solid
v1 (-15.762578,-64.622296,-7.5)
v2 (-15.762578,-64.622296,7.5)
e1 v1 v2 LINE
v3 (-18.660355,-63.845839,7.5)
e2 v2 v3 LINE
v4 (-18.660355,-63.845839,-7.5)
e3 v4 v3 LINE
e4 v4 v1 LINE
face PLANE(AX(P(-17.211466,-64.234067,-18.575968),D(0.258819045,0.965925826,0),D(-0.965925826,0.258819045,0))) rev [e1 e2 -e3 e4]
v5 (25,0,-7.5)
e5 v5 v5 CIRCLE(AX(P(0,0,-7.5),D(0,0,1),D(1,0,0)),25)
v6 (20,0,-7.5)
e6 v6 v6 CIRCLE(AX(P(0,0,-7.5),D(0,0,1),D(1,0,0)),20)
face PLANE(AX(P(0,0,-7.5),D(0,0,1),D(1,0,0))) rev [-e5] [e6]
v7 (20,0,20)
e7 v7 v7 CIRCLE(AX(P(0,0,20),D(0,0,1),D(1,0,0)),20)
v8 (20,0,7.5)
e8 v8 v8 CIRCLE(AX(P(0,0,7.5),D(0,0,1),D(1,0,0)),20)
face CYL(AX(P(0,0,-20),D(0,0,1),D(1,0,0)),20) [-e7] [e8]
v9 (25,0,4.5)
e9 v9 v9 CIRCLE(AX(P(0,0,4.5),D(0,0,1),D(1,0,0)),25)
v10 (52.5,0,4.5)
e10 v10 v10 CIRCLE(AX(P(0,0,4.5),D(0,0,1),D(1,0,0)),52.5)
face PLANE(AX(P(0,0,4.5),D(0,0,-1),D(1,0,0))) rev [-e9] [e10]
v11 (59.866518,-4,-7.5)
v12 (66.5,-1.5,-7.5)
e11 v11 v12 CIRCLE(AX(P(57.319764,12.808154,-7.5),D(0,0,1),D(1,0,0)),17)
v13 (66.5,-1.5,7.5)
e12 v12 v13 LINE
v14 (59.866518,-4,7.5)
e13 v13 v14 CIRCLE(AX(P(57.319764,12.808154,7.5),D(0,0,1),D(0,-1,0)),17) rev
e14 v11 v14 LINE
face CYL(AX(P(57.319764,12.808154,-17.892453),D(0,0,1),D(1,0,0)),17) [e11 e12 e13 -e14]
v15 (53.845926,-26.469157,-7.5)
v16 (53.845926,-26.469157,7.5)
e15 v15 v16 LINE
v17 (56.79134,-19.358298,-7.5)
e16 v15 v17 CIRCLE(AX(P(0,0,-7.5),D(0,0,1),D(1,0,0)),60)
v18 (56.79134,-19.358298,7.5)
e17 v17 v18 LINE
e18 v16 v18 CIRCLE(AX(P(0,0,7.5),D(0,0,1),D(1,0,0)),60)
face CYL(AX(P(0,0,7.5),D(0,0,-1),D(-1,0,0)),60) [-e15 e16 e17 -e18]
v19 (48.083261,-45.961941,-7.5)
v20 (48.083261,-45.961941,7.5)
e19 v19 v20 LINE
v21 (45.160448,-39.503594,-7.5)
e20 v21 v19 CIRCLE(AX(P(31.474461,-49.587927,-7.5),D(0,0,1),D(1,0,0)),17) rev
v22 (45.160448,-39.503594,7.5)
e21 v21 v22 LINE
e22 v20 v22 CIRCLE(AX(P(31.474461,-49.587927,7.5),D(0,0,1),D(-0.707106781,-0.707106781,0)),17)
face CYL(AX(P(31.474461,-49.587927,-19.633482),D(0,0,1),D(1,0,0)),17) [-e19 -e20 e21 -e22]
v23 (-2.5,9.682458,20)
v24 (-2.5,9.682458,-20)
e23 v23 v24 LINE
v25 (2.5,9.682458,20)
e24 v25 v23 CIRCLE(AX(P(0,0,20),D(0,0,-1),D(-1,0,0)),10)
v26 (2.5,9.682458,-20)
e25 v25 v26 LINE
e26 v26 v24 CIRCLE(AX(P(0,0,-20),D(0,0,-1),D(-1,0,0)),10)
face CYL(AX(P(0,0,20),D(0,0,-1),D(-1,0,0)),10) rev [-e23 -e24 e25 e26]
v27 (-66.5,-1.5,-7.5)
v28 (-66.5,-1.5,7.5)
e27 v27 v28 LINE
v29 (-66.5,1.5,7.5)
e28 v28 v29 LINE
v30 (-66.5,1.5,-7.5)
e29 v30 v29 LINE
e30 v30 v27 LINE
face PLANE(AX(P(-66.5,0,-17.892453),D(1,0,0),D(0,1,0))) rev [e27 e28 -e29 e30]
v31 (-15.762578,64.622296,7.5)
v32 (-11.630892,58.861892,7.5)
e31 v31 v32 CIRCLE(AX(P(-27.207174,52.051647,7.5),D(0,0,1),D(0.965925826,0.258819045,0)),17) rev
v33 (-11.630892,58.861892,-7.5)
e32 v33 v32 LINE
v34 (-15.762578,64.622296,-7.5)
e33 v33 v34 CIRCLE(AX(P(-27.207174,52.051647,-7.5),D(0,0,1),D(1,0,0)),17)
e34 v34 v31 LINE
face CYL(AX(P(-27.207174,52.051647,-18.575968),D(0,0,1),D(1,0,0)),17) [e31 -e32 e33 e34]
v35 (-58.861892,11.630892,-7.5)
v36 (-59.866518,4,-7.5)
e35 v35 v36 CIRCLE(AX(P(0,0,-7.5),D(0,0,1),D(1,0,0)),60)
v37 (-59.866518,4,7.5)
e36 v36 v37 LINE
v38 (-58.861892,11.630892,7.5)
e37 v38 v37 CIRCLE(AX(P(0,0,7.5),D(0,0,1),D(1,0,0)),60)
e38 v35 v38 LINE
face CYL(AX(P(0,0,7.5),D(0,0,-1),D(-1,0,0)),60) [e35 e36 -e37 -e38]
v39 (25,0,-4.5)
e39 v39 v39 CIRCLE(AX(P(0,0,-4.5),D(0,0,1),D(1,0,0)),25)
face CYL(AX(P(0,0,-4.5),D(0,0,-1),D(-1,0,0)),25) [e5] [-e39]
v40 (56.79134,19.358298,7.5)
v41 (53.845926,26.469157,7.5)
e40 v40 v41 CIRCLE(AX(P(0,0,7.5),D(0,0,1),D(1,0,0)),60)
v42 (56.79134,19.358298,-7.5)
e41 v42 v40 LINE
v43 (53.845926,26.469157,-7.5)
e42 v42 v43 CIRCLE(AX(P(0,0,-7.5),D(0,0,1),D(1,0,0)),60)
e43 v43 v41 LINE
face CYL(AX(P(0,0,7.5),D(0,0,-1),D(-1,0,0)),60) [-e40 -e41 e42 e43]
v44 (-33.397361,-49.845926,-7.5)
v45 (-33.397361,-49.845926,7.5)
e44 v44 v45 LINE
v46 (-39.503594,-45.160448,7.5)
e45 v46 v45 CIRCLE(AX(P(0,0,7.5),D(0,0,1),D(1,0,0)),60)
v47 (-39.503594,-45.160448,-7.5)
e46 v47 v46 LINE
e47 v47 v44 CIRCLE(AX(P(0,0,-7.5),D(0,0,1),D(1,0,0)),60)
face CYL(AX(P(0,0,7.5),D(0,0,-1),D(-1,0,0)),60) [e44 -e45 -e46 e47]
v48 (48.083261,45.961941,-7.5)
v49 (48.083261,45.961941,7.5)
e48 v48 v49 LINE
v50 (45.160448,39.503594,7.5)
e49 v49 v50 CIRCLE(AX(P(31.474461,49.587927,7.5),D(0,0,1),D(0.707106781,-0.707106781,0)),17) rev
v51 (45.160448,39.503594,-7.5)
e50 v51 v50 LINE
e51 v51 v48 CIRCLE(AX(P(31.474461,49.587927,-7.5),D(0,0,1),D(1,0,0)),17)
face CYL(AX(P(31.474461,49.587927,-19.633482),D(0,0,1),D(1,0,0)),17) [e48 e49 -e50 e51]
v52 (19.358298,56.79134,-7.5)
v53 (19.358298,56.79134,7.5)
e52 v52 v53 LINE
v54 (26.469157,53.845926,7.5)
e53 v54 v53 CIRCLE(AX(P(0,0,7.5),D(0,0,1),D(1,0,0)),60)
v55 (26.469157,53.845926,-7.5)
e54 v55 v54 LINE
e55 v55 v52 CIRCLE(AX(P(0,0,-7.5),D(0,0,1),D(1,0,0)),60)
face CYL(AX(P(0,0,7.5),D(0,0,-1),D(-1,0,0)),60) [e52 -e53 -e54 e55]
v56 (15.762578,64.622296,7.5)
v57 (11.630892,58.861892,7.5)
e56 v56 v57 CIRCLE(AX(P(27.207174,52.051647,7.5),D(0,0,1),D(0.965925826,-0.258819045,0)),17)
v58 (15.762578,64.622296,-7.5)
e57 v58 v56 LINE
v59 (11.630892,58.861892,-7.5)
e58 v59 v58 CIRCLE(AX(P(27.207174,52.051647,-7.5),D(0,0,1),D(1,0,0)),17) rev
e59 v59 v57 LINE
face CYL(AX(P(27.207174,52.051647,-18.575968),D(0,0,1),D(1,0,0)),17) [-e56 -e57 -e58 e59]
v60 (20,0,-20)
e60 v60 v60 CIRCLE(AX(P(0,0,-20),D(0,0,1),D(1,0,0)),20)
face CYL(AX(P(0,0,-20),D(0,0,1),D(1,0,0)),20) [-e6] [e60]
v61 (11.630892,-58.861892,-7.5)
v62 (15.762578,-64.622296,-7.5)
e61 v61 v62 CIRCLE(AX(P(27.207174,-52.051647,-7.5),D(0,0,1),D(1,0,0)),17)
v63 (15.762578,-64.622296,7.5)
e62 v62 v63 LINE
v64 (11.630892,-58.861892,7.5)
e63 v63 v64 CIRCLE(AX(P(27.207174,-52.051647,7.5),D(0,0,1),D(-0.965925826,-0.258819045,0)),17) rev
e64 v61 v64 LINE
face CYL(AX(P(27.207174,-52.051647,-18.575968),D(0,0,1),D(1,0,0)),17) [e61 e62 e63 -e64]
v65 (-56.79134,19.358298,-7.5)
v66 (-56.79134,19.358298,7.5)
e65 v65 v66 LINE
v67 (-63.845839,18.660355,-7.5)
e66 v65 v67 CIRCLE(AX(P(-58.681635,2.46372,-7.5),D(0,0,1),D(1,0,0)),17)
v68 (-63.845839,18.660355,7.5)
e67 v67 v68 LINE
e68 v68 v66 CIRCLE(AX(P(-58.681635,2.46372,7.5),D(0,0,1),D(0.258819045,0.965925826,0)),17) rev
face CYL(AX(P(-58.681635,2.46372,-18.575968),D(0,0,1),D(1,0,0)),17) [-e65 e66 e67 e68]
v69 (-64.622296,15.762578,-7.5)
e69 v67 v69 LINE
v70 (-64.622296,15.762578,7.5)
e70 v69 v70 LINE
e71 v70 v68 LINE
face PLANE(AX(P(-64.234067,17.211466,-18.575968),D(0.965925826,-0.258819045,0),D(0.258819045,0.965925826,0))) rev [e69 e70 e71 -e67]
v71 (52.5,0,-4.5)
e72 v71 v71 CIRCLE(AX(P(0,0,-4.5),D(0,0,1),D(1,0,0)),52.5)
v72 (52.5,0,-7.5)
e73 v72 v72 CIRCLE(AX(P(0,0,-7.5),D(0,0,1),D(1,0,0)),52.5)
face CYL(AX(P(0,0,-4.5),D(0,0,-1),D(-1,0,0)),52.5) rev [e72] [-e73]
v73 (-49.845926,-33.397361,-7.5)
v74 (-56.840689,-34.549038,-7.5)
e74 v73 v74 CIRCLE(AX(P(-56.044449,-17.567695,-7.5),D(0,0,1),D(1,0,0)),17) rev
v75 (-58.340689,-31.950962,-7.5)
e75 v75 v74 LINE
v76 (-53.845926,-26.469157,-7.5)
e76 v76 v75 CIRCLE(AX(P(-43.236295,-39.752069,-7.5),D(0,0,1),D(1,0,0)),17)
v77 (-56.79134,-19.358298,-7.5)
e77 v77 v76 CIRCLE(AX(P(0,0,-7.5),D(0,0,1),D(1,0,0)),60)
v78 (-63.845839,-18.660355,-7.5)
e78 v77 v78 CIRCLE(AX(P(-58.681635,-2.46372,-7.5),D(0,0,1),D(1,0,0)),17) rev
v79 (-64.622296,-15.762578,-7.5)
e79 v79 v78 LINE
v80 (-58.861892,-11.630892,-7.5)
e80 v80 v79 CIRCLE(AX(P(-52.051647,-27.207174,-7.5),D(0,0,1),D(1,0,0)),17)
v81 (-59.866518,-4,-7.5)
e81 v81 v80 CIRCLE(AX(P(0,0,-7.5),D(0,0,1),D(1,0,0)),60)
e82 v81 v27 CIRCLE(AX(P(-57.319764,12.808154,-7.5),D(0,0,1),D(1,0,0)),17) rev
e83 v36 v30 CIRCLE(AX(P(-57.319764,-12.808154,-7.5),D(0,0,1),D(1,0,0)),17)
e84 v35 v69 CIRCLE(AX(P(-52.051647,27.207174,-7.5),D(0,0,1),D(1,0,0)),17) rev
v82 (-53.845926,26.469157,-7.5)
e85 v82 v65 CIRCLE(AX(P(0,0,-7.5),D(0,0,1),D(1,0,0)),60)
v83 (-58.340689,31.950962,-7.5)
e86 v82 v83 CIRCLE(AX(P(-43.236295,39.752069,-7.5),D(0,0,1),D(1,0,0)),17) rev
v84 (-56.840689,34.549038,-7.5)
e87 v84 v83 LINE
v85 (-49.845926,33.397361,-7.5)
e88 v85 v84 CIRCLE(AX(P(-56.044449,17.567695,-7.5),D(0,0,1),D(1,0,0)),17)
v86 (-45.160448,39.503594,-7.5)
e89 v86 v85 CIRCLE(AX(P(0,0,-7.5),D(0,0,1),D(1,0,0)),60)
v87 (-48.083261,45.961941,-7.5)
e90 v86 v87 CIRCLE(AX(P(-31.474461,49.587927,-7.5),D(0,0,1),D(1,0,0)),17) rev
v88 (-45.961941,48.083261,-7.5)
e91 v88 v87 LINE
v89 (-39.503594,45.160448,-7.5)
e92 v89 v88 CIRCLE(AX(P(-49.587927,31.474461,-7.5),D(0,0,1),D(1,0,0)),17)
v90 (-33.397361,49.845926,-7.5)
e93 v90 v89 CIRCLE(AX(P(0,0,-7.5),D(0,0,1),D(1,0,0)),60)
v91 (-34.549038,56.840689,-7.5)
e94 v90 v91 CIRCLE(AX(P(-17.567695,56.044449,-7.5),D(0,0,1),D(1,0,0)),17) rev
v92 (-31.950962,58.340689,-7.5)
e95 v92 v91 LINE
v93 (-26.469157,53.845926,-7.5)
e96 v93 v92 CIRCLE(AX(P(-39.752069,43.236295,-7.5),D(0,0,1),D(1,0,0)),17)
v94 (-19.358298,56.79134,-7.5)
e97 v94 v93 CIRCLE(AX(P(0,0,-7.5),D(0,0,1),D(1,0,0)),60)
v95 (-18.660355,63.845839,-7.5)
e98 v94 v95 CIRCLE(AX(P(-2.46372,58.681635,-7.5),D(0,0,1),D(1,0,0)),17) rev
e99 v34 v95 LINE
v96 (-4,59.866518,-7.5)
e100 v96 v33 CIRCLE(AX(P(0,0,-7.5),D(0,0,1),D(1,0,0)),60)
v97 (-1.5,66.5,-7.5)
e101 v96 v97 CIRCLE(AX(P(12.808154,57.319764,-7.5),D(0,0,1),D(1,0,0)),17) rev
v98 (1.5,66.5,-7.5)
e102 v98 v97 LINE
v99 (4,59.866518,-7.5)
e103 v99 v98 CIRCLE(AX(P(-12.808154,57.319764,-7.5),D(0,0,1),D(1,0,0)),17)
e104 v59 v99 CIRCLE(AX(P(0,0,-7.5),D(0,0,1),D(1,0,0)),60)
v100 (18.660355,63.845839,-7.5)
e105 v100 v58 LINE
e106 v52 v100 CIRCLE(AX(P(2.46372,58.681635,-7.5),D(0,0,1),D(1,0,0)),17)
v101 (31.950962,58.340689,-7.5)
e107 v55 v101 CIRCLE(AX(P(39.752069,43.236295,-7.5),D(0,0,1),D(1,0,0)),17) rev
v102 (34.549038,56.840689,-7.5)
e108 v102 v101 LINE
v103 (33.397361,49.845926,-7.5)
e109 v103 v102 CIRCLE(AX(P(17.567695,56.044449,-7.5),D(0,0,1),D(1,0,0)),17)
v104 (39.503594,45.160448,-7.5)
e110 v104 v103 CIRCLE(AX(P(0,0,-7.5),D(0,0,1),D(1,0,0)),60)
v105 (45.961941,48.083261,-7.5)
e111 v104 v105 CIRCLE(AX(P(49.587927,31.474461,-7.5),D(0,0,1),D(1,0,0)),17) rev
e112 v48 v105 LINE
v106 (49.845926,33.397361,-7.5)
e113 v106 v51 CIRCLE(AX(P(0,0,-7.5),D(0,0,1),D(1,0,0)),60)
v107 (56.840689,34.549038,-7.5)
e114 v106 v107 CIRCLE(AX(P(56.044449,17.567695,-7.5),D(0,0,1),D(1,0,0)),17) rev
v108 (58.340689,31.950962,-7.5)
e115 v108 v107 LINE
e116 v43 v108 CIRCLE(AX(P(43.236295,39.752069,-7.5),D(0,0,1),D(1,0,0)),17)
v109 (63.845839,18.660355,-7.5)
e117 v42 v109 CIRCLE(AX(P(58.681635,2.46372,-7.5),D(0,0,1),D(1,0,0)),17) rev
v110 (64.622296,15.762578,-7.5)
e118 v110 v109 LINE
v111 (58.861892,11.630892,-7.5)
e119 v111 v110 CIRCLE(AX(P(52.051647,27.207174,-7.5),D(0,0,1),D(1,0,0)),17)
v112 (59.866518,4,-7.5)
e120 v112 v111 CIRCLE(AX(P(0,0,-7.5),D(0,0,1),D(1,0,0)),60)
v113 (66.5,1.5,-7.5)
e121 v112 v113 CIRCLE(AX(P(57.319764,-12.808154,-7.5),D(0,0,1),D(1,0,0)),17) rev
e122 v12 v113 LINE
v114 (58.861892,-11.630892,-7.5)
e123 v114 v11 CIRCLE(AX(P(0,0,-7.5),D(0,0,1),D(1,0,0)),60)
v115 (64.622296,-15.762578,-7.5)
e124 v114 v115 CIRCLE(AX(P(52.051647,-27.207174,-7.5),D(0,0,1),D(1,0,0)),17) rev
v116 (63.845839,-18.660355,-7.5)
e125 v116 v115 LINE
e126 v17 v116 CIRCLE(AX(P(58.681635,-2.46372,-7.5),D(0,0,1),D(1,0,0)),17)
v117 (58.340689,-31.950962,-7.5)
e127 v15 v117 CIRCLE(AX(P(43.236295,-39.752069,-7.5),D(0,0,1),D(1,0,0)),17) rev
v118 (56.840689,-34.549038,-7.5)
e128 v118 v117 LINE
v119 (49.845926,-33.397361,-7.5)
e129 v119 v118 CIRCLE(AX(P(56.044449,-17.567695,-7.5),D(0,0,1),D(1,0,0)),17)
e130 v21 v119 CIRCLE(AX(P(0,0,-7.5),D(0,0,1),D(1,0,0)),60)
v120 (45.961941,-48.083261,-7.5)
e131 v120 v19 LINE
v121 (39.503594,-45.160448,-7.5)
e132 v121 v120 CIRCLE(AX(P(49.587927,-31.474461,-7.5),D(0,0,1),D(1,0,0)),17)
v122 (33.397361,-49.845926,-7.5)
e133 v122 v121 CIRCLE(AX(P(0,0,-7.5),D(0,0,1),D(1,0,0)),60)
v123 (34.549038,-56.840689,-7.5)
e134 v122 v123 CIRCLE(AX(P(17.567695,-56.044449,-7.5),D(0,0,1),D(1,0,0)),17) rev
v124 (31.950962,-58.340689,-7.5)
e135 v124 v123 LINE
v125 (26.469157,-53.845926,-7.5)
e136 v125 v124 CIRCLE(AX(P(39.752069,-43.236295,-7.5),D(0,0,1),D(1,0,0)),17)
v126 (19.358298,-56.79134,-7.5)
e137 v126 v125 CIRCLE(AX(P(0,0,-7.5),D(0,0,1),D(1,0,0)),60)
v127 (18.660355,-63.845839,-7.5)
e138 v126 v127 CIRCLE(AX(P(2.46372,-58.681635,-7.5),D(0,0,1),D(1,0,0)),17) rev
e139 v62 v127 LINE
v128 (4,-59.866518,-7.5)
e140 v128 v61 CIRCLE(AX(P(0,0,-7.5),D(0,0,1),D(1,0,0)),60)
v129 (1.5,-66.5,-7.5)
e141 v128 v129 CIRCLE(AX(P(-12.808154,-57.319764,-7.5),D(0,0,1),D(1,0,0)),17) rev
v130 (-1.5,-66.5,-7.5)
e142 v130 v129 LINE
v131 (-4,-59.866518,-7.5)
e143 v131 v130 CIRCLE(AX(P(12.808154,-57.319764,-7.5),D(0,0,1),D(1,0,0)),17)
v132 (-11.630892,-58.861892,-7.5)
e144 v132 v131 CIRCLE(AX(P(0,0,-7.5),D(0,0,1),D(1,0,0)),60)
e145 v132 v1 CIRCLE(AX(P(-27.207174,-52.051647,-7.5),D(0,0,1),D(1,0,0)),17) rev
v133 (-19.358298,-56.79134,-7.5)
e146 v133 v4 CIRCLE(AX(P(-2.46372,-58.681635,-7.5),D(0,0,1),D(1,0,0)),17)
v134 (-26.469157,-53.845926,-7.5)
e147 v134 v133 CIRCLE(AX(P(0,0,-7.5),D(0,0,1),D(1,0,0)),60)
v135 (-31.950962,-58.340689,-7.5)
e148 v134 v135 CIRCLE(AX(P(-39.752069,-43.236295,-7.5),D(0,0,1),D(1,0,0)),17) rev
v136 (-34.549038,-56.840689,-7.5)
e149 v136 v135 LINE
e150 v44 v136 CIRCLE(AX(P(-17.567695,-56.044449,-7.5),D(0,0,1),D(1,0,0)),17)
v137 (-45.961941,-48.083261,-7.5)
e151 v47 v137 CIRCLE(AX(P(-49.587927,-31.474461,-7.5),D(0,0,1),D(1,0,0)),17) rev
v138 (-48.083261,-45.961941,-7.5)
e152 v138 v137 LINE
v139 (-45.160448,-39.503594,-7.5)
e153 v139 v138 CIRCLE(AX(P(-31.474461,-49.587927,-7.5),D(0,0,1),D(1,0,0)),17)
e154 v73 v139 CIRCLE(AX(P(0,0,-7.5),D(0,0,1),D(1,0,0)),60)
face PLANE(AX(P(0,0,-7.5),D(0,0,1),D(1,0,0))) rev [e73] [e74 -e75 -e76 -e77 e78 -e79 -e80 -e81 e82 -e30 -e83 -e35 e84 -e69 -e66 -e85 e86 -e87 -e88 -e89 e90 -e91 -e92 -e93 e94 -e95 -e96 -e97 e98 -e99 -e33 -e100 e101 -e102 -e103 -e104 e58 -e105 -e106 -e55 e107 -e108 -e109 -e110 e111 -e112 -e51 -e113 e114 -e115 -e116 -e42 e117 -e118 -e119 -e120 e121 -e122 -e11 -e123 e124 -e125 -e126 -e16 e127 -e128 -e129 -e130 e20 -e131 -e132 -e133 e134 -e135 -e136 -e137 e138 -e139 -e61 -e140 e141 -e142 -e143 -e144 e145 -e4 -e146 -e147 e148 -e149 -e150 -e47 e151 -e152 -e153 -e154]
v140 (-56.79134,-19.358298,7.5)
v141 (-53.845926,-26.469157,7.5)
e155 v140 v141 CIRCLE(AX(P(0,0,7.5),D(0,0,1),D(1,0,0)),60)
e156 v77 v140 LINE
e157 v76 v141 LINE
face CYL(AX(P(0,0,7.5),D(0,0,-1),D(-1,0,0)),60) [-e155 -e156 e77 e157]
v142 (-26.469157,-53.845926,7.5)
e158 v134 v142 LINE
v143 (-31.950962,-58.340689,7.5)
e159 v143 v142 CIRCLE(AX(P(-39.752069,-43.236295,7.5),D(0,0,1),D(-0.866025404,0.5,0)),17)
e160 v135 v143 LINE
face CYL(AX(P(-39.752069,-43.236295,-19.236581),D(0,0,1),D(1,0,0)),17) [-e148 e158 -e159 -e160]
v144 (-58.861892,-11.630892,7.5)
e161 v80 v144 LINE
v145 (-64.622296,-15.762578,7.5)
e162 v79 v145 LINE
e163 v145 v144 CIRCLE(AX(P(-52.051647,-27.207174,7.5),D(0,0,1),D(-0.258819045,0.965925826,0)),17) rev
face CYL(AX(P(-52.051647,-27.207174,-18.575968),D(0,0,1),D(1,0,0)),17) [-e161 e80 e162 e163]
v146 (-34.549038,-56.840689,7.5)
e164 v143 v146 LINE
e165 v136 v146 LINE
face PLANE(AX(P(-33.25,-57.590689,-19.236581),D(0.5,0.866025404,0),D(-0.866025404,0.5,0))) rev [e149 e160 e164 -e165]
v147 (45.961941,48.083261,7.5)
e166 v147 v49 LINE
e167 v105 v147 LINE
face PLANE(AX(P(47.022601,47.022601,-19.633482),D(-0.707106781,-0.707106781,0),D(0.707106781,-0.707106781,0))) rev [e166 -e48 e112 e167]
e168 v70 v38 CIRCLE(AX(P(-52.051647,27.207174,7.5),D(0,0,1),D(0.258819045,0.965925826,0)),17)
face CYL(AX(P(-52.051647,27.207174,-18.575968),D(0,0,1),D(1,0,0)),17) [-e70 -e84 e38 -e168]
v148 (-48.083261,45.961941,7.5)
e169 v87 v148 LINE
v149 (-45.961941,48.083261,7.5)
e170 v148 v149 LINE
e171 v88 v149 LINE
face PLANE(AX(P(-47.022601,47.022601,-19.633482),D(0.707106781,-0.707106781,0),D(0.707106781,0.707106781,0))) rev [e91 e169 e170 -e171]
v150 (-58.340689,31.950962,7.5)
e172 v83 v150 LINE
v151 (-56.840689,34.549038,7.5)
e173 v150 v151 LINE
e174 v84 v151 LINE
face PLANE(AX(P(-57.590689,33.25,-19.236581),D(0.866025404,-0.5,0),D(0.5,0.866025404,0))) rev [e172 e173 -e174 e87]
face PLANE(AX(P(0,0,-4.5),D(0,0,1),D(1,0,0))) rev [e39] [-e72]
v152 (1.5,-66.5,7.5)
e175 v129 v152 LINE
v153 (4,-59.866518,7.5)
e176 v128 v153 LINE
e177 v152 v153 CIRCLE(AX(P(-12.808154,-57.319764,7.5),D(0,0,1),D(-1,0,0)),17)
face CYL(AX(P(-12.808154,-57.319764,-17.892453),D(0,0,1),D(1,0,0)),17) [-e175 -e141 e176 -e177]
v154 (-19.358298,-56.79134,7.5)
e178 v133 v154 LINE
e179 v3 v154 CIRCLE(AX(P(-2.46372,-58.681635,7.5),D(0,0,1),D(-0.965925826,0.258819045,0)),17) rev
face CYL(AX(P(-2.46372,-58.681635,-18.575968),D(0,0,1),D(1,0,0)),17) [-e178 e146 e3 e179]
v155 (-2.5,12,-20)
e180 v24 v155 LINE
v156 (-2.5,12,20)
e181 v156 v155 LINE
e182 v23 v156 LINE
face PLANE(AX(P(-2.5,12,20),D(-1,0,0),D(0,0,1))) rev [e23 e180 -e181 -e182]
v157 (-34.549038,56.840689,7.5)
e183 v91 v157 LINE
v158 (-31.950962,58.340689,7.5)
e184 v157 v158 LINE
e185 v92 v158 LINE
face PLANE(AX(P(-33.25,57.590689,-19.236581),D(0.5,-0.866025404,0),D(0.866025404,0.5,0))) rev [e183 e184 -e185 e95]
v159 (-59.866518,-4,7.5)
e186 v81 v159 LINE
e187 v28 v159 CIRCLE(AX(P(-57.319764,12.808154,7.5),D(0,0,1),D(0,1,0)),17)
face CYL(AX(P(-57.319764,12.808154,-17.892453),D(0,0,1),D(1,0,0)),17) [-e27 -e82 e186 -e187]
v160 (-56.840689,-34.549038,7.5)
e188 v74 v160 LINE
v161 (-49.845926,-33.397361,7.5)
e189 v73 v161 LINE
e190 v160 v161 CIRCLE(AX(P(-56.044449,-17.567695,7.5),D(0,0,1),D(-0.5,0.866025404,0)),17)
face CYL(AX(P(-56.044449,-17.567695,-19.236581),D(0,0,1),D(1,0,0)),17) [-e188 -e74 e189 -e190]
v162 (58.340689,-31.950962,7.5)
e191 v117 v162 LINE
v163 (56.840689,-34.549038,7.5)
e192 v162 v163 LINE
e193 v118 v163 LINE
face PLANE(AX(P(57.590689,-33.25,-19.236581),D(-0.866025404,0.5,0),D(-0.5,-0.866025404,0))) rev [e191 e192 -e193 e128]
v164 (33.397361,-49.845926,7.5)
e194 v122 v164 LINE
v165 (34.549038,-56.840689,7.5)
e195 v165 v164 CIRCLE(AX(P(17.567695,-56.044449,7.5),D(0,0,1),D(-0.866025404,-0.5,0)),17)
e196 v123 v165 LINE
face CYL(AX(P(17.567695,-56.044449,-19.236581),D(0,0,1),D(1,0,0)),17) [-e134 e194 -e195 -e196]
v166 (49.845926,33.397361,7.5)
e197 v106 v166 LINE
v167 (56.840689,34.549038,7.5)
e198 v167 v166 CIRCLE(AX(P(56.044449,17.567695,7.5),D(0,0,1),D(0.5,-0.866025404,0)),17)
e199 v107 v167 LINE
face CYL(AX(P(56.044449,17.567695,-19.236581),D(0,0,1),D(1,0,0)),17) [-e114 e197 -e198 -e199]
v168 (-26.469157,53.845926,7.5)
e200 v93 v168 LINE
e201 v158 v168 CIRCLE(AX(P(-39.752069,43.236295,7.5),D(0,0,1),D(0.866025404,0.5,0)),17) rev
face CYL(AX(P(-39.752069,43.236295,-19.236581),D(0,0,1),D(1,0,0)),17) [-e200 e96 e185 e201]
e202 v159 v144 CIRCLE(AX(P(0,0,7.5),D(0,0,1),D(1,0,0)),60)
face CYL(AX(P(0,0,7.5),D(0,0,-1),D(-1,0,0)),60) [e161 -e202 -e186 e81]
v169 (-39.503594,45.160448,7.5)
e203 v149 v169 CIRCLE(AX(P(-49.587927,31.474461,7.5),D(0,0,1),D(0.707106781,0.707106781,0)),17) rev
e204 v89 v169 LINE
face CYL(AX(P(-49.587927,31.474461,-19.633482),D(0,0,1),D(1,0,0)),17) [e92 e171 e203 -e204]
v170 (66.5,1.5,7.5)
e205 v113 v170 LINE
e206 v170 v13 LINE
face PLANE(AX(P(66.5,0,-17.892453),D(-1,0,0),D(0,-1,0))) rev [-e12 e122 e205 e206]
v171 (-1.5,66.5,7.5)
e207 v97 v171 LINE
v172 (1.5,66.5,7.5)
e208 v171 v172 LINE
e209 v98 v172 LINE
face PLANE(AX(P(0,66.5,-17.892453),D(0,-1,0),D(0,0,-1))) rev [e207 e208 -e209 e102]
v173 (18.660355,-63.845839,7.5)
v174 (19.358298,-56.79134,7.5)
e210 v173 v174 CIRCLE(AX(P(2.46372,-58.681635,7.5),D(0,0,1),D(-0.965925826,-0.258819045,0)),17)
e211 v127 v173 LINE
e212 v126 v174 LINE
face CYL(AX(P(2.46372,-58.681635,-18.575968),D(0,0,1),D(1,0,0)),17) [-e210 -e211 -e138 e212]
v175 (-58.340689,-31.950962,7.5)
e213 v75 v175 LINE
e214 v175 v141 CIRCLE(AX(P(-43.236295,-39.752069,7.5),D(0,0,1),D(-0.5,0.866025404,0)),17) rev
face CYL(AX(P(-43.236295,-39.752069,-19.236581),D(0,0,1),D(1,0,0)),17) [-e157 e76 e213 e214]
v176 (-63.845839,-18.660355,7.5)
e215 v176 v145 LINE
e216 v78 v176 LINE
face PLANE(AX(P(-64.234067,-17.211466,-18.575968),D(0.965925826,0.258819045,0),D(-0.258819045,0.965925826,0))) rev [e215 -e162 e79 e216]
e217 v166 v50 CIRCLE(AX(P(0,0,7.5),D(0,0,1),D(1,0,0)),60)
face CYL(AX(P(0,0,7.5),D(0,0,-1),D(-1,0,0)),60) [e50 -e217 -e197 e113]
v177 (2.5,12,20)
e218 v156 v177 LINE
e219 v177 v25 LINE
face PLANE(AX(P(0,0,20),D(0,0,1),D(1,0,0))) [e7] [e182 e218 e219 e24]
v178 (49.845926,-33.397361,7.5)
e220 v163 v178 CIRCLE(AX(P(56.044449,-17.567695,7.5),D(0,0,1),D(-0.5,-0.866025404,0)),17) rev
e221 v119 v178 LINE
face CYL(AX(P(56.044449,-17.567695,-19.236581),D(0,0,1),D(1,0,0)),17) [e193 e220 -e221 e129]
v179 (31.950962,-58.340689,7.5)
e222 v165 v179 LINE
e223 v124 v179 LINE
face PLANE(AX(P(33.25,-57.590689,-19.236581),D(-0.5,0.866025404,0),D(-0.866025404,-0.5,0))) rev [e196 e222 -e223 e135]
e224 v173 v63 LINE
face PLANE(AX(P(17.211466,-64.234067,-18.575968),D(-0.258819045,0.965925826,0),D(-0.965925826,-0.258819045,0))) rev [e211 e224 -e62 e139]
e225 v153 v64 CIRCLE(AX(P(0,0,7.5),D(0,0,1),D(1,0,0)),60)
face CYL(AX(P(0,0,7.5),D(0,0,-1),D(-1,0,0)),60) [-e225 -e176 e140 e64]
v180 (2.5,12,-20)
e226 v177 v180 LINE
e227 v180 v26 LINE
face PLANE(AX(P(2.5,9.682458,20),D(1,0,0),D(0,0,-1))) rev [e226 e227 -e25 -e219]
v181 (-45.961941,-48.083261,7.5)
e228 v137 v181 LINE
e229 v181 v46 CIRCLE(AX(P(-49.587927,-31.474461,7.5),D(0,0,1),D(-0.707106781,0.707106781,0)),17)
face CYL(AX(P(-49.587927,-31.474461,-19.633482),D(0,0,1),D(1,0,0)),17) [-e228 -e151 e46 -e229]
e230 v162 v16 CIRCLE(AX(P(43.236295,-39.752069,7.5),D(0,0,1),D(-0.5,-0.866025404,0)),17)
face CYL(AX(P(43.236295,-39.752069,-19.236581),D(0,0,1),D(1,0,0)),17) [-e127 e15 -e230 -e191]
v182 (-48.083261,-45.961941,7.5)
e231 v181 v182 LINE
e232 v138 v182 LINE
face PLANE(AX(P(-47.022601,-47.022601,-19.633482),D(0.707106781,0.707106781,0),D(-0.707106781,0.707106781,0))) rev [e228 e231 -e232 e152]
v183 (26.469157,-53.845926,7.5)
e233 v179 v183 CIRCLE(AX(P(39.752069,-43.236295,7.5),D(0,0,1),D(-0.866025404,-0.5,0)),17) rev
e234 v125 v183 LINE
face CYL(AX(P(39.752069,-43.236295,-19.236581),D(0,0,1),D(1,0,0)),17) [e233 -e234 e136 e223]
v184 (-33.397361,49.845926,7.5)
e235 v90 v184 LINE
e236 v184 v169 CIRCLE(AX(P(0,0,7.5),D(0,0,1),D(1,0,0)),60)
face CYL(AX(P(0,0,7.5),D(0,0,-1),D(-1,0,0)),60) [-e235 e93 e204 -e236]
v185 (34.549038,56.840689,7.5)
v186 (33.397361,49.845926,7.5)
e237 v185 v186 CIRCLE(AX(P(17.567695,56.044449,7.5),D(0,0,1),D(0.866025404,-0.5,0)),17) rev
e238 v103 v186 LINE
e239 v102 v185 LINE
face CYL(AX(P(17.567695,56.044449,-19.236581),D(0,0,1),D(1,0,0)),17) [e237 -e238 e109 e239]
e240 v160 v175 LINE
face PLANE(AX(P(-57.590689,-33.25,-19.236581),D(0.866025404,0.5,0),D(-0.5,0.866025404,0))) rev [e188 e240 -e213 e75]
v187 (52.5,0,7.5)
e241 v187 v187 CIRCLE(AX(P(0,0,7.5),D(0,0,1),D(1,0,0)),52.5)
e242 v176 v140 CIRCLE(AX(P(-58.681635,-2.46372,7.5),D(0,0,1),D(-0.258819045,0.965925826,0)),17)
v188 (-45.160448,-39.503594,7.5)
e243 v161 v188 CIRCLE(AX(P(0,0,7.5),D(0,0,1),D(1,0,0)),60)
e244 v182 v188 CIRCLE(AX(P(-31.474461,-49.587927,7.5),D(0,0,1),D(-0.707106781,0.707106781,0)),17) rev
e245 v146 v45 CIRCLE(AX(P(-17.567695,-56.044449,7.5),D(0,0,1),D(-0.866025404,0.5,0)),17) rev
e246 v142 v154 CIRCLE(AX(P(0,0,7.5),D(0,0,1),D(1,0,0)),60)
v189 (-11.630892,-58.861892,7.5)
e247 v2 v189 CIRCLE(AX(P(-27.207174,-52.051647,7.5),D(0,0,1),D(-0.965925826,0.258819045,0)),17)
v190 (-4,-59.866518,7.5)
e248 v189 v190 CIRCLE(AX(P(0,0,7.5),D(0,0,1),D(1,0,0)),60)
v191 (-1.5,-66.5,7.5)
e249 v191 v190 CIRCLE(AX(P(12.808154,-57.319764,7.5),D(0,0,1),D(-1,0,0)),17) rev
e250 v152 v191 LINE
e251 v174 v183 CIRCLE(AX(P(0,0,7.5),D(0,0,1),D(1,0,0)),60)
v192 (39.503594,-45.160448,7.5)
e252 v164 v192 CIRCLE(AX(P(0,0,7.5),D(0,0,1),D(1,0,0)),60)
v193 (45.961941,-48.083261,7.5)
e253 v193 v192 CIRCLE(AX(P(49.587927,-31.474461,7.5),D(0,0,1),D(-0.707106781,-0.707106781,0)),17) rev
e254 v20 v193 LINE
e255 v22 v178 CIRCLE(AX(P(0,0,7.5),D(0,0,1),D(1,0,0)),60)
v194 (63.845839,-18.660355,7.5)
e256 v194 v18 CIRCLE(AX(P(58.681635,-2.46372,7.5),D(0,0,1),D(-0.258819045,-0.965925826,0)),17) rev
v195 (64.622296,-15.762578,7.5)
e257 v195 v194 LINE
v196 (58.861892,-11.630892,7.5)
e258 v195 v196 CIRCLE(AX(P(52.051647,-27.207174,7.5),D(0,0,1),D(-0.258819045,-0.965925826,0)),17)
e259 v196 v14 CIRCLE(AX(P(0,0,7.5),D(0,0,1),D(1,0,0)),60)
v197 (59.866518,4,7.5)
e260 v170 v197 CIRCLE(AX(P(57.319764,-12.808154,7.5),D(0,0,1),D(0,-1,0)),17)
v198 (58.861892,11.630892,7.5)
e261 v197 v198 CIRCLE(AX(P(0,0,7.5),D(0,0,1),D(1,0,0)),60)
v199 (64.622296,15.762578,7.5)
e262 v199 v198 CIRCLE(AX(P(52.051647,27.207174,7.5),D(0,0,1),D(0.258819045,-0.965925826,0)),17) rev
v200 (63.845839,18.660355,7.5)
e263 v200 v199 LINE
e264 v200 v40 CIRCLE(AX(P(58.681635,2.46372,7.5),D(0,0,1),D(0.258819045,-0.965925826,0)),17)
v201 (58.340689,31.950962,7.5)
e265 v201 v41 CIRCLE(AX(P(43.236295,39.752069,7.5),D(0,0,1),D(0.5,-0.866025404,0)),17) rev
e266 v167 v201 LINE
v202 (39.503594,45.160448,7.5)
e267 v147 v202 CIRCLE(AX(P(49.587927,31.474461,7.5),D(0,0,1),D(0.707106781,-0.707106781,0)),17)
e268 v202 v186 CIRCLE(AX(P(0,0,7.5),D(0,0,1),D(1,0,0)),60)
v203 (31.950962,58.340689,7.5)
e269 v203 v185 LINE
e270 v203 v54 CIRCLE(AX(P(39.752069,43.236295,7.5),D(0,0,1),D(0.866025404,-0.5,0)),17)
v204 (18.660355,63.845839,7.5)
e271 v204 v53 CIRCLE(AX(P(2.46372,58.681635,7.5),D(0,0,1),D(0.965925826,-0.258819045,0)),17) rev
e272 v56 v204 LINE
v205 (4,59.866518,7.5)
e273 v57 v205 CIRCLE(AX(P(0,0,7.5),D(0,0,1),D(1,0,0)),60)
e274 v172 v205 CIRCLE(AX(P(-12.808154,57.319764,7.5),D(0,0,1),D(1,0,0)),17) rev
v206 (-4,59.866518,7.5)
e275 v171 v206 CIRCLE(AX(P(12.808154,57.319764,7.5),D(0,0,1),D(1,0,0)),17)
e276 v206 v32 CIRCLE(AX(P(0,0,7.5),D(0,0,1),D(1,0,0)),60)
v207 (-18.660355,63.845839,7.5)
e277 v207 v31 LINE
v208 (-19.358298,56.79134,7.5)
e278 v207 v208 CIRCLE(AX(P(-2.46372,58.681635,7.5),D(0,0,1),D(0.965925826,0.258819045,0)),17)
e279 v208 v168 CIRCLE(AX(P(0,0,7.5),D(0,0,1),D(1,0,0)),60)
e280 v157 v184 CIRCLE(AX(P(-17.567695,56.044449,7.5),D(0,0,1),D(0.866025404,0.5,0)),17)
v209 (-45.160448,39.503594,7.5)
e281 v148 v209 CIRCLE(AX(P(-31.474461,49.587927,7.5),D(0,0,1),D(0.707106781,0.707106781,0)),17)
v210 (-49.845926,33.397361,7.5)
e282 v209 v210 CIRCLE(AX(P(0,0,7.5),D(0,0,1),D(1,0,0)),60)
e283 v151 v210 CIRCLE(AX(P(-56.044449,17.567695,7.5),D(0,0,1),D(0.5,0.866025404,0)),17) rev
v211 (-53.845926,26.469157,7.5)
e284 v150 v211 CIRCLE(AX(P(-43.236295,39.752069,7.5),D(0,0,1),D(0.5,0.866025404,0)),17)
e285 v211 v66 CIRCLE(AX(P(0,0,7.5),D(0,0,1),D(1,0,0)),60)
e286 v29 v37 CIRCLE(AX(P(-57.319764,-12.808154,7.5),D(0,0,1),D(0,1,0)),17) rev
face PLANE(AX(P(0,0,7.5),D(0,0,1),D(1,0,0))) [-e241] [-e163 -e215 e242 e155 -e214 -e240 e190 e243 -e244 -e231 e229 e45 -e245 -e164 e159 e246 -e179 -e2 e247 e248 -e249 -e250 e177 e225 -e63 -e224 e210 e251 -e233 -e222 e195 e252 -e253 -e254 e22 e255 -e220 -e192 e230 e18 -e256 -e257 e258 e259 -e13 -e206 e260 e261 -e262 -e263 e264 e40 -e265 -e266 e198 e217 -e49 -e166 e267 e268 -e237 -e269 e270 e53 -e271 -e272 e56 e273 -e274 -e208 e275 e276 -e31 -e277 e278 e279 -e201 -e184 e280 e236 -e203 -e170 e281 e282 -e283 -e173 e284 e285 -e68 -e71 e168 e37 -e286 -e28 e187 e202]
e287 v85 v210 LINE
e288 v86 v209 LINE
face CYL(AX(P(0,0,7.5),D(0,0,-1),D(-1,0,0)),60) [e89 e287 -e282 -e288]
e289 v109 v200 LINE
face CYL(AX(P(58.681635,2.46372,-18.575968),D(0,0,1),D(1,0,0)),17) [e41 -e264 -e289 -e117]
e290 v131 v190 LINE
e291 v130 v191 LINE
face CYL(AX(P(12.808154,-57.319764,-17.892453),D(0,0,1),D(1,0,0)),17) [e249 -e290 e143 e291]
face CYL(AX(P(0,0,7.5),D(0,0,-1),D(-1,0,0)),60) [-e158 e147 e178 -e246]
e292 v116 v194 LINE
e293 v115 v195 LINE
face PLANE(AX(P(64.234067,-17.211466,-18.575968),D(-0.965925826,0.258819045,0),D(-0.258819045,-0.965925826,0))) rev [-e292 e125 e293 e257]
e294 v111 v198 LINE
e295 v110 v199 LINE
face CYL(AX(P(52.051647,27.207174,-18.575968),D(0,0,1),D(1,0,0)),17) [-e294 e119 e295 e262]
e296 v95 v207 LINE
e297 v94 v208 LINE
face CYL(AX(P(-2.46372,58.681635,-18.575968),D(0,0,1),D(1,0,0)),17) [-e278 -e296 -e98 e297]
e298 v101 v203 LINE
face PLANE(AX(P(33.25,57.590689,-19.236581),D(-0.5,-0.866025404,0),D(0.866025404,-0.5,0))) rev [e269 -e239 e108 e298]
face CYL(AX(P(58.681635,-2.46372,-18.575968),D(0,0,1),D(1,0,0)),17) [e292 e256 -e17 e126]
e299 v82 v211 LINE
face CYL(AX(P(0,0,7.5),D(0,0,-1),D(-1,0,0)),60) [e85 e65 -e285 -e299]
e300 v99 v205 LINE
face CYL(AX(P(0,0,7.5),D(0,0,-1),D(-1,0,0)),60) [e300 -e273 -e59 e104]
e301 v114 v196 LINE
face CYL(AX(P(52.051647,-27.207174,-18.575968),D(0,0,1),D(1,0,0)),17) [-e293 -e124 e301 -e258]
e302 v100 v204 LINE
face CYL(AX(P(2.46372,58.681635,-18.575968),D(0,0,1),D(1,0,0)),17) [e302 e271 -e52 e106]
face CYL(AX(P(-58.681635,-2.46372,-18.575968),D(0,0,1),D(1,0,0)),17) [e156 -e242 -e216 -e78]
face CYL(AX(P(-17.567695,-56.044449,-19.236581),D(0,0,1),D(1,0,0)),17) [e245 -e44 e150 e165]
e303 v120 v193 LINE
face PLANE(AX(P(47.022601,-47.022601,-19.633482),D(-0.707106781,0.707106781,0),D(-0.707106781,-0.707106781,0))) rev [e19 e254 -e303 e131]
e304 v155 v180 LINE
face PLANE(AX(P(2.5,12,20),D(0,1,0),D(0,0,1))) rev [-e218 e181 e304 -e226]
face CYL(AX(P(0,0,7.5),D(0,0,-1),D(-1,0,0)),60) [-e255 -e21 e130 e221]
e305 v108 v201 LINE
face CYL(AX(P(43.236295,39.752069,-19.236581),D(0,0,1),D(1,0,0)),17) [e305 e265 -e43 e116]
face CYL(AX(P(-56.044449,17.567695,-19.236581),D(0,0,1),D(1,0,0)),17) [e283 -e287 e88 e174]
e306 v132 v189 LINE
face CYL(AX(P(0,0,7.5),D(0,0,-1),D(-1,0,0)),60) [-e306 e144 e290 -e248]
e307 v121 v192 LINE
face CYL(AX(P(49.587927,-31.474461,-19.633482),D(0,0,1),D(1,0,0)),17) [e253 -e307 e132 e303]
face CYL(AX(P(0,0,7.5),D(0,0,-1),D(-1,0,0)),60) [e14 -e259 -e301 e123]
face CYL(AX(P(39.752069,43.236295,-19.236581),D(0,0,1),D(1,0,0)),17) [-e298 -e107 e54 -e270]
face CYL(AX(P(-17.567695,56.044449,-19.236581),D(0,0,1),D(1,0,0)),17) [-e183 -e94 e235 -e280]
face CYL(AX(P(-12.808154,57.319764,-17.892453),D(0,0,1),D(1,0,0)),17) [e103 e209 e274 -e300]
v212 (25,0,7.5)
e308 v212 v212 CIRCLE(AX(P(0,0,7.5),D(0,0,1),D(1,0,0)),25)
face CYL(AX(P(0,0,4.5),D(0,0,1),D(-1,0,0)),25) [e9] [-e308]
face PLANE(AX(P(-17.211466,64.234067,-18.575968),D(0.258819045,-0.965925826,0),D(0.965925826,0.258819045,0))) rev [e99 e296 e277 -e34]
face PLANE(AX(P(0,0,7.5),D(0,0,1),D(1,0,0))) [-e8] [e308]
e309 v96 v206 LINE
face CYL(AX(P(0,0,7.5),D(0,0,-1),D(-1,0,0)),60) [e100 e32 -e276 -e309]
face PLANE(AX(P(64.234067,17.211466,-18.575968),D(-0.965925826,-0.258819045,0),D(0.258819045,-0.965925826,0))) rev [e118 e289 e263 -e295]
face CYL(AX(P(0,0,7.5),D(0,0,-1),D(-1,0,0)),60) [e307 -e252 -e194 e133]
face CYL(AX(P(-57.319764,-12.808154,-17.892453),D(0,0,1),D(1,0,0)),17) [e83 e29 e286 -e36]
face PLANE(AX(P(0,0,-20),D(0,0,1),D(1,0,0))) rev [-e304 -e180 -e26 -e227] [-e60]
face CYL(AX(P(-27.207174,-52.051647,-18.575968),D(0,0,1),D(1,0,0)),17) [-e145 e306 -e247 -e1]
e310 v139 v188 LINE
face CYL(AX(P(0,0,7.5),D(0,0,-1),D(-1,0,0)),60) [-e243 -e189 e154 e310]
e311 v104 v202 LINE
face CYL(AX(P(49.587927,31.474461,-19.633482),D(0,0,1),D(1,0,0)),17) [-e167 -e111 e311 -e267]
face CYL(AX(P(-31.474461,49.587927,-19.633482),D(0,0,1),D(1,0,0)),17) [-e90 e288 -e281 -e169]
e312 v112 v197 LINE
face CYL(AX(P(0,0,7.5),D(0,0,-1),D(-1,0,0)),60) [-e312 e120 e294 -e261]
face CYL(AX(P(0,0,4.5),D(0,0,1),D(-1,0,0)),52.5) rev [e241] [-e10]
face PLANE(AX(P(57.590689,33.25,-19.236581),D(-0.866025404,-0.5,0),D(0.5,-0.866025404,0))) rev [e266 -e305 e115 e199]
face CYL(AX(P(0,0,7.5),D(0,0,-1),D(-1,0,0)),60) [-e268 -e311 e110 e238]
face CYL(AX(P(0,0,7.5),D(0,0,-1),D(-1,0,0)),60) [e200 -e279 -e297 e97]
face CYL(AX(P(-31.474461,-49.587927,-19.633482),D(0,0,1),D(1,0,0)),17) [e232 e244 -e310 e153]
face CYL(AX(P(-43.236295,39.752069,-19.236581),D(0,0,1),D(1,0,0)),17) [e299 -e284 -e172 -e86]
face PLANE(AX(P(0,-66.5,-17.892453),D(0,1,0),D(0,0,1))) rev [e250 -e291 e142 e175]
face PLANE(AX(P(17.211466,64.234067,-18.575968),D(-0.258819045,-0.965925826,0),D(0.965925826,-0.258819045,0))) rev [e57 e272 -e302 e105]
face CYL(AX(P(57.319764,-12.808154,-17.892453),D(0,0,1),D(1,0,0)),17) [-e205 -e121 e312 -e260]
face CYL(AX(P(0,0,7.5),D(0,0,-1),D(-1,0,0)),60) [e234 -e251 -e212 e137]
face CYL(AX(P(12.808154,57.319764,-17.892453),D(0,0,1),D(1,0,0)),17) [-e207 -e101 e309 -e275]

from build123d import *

# Parameters (mm, degrees)
SKETCH1_R           = 60
BOSS_EXTRUDE1_DEPTH = 7.5
BOSS_EXTRUDE2_DEPTH = 15
CIRPATTERN1_START   = -7.5
CIRPATTERN1_DEPTH   = 15
SKETCH3_R           = 20
BOSS_EXTRUDE3_DEPTH = 20
CUT_EXTRUDE1_DEPTH  = 103.198336581
CUT_EXTRUDE4_START  = -7.5
SKETCH5_R           = 52.5
SKETCH5_R_2         = 25
CUT_EXTRUDE4_DEPTH  = 3


# Read off the part's stored shape, not the designer's step: CirPattern1
with BuildPart() as part:
    # Sketch1 → Boss-Extrude1 (new, symmetric)
    with BuildSketch(Plane.XY):
        Circle(SKETCH1_R)
    extrude(amount=BOSS_EXTRUDE1_DEPTH, both=True)

    # Sketch2 → Boss-Extrude2 (add)
    with BuildSketch(Plane.XY.offset(7.5)):
        with BuildLine():
            Line((0, 66.5), (0, 60))
            ThreePointArc((0, 60), (2.001113277, 59.966620262), (4, 59.866518188))
            ThreePointArc((4, 59.866518188), (3.099609074, 63.315018359), (1.5, 66.5))
            Line((1.5, 66.5), (0, 66.5))
        make_face()
        with BuildLine():
            ThreePointArc((-4, 59.866518188), (-2.001113277, 59.966620262), (0, 60))
            Line((0, 60), (0, 66.5))
            Line((0, 66.5), (-1.5, 66.5))
            ThreePointArc((-1.5, 66.5), (-3.099609074, 63.315018359), (-4, 59.866518188))
        make_face()
    extrude(amount=-BOSS_EXTRUDE2_DEPTH)

    # CirPattern1 outline → CirPattern1 (add)
    with BuildSketch(Plane.XY.offset(CIRPATTERN1_START)):
        with BuildLine():
            ThreePointArc((-18.660355239, 63.845838881), (-19.381125049, 60.355373564), (-19.358298376, 56.791339868))
            ThreePointArc((-19.358298376, 56.791339868), (-15.529142706, 57.955549577), (-11.630891766, 58.861892228))
            ThreePointArc((-11.630891766, 58.861892228), (-13.393140136, 61.959849286), (-15.76257776, 64.622296016))
            Line((-15.76257776, 64.622296016), (-18.660355239, 63.845838881))
        make_face()
        with BuildLine():
            ThreePointArc((-34.549038106, 56.840689352), (-34.34184938, 53.282609803), (-33.397360709, 49.845925587))
            ThreePointArc((-33.397360709, 49.845925587), (-30, 51.961524227), (-26.469157479, 53.845925587))
            ThreePointArc((-26.469157479, 53.845925587), (-28.973168979, 56.382218877), (-31.950961894, 58.340689352))
            Line((-31.950961894, 58.340689352), (-34.549038106, 56.840689352))
        make_face()
        with BuildLine():
            ThreePointArc((-48.083261121, 45.961940777), (-46.962233428, 42.578724237), (-45.160448102, 39.503593852))
            ThreePointArc((-45.160448102, 39.503593852), (-42.426406871, 42.426406871), (-39.503593852, 45.160448102))
            ThreePointArc((-39.503593852, 45.160448102), (-42.578724237, 46.962233428), (-45.961940777, 48.083261121))
            Line((-45.961940777, 48.083261121), (-48.083261121, 45.961940777))
        make_face()
        with BuildLine():
            ThreePointArc((-58.340689352, 31.950961894), (-56.382218877, 28.973168979), (-53.845925587, 26.469157479))
            ThreePointArc((-53.845925587, 26.469157479), (-51.961524227, 30), (-49.845925587, 33.397360709))
            ThreePointArc((-49.845925587, 33.397360709), (-53.282609803, 34.34184938), (-56.840689352, 34.549038106))
            Line((-56.840689352, 34.549038106), (-58.340689352, 31.950961894))
        make_face()
        with BuildLine():
            ThreePointArc((-64.622296016, 15.76257776), (-61.959849286, 13.393140136), (-58.861892229, 11.630891766))
            ThreePointArc((-58.861892229, 11.630891766), (-57.955549577, 15.529142706), (-56.791339868, 19.358298376))
            ThreePointArc((-56.791339868, 19.358298376), (-60.355373564, 19.381125049), (-63.845838881, 18.660355239))
            Line((-63.845838881, 18.660355239), (-64.622296016, 15.76257776))
        make_face()
        with BuildLine():
            ThreePointArc((-66.5, -1.5), (-63.315018359, -3.099609074), (-59.866518188, -4))
            ThreePointArc((-59.866518188, -4), (-60, 0), (-59.866518188, 4))
            ThreePointArc((-59.866518188, 4), (-63.315018359, 3.099609074), (-66.5, 1.5))
            Line((-66.5, 1.5), (-66.5, -1.5))
        make_face()
        with BuildLine():
            ThreePointArc((-63.845838881, -18.660355239), (-60.355373564, -19.381125049), (-56.791339868, -19.358298376))
            ThreePointArc((-56.791339868, -19.358298376), (-57.955549577, -15.529142706), (-58.861892228, -11.630891766))
            ThreePointArc((-58.861892228, -11.630891766), (-61.959849286, -13.393140136), (-64.622296016, -15.76257776))
            Line((-64.622296016, -15.76257776), (-63.845838881, -18.660355239))
        make_face()
        with BuildLine():
            ThreePointArc((-56.840689352, -34.549038106), (-53.282609803, -34.34184938), (-49.845925587, -33.397360709))
            ThreePointArc((-49.845925587, -33.397360709), (-51.961524227, -30), (-53.845925587, -26.469157479))
            ThreePointArc((-53.845925587, -26.469157479), (-56.382218877, -28.973168979), (-58.340689352, -31.950961894))
            Line((-58.340689352, -31.950961894), (-56.840689352, -34.549038106))
        make_face()
        with BuildLine():
            ThreePointArc((-45.961940777, -48.083261121), (-42.578724237, -46.962233428), (-39.503593852, -45.160448102))
            ThreePointArc((-39.503593852, -45.160448102), (-42.426406871, -42.426406871), (-45.160448102, -39.503593852))
            ThreePointArc((-45.160448102, -39.503593852), (-46.962233428, -42.578724237), (-48.083261121, -45.961940777))
            Line((-48.083261121, -45.961940777), (-45.961940777, -48.083261121))
        make_face()
        with BuildLine():
            ThreePointArc((-31.950961894, -58.340689352), (-28.973168979, -56.382218877), (-26.469157479, -53.845925587))
            ThreePointArc((-26.469157479, -53.845925587), (-30, -51.961524227), (-33.397360709, -49.845925587))
            ThreePointArc((-33.397360709, -49.845925587), (-34.34184938, -53.282609803), (-34.549038106, -56.840689352))
            Line((-34.549038106, -56.840689352), (-31.950961894, -58.340689352))
        make_face()
        with BuildLine():
            ThreePointArc((-15.76257776, -64.622296016), (-13.393140136, -61.959849286), (-11.630891766, -58.861892229))
            ThreePointArc((-11.630891766, -58.861892229), (-15.529142706, -57.955549577), (-19.358298376, -56.791339868))
            ThreePointArc((-19.358298376, -56.791339868), (-19.381125049, -60.355373564), (-18.660355239, -63.845838881))
            Line((-18.660355239, -63.845838881), (-15.76257776, -64.622296016))
        make_face()
        with BuildLine():
            ThreePointArc((1.5, -66.5), (3.099609074, -63.315018359), (4, -59.866518188))
            ThreePointArc((4, -59.866518188), (0, -60), (-4, -59.866518188))
            ThreePointArc((-4, -59.866518188), (-3.099609074, -63.315018359), (-1.5, -66.5))
            Line((-1.5, -66.5), (1.5, -66.5))
        make_face()
        with BuildLine():
            ThreePointArc((18.660355239, -63.845838881), (19.381125049, -60.355373564), (19.358298376, -56.791339868))
            ThreePointArc((19.358298376, -56.791339868), (15.529142706, -57.955549577), (11.630891766, -58.861892229))
            ThreePointArc((11.630891766, -58.861892229), (13.393140136, -61.959849286), (15.76257776, -64.622296016))
            Line((15.76257776, -64.622296016), (18.660355239, -63.845838881))
        make_face()
        with BuildLine():
            ThreePointArc((34.549038106, -56.840689352), (34.34184938, -53.282609803), (33.397360709, -49.845925587))
            ThreePointArc((33.397360709, -49.845925587), (30, -51.961524227), (26.469157479, -53.845925587))
            ThreePointArc((26.469157479, -53.845925587), (28.973168979, -56.382218877), (31.950961894, -58.340689352))
            Line((31.950961894, -58.340689352), (34.549038106, -56.840689352))
        make_face()
        with BuildLine():
            ThreePointArc((48.083261121, -45.961940777), (46.962233428, -42.578724237), (45.160448102, -39.503593852))
            ThreePointArc((45.160448102, -39.503593852), (42.426406871, -42.426406871), (39.503593852, -45.160448102))
            ThreePointArc((39.503593852, -45.160448102), (42.578724237, -46.962233428), (45.961940777, -48.083261121))
            Line((45.961940777, -48.083261121), (48.083261121, -45.961940777))
        make_face()
        with BuildLine():
            ThreePointArc((58.340689352, -31.950961894), (56.382218877, -28.973168979), (53.845925587, -26.469157479))
            ThreePointArc((53.845925587, -26.469157479), (51.961524227, -30), (49.845925587, -33.397360709))
            ThreePointArc((49.845925587, -33.397360709), (53.282609803, -34.34184938), (56.840689352, -34.549038106))
            Line((56.840689352, -34.549038106), (58.340689352, -31.950961894))
        make_face()
        with BuildLine():
            ThreePointArc((64.622296016, -15.76257776), (61.959849286, -13.393140136), (58.861892229, -11.630891766))
            ThreePointArc((58.861892229, -11.630891766), (57.955549577, -15.529142706), (56.791339868, -19.358298376))
            ThreePointArc((56.791339868, -19.358298376), (60.355373564, -19.381125049), (63.845838881, -18.660355239))
            Line((63.845838881, -18.660355239), (64.622296016, -15.76257776))
        make_face()
        with BuildLine():
            ThreePointArc((66.5, 1.5), (63.315018359, 3.099609074), (59.866518188, 4))
            ThreePointArc((59.866518188, 4), (60, 0), (59.866518188, -4))
            ThreePointArc((59.866518188, -4), (63.315018359, -3.099609074), (66.5, -1.5))
            Line((66.5, -1.5), (66.5, 1.5))
        make_face()
        with BuildLine():
            ThreePointArc((63.845838881, 18.660355239), (60.355373564, 19.381125049), (56.791339868, 19.358298376))
            ThreePointArc((56.791339868, 19.358298376), (57.955549577, 15.529142706), (58.861892228, 11.630891766))
            ThreePointArc((58.861892228, 11.630891766), (61.959849286, 13.393140136), (64.622296016, 15.76257776))
            Line((64.622296016, 15.76257776), (63.845838881, 18.660355239))
        make_face()
        with BuildLine():
            ThreePointArc((56.840689352, 34.549038106), (53.282609803, 34.34184938), (49.845925587, 33.397360709))
            ThreePointArc((49.845925587, 33.397360709), (51.961524227, 30), (53.845925587, 26.469157479))
            ThreePointArc((53.845925587, 26.469157479), (56.382218877, 28.973168979), (58.340689352, 31.950961894))
            Line((58.340689352, 31.950961894), (56.840689352, 34.549038106))
        make_face()
        with BuildLine():
            ThreePointArc((45.961940777, 48.083261121), (42.578724237, 46.962233428), (39.503593852, 45.160448102))
            ThreePointArc((39.503593852, 45.160448102), (42.426406871, 42.426406871), (45.160448102, 39.503593852))
            ThreePointArc((45.160448102, 39.503593852), (46.962233428, 42.578724237), (48.083261121, 45.961940777))
            Line((48.083261121, 45.961940777), (45.961940777, 48.083261121))
        make_face()
        with BuildLine():
            ThreePointArc((31.950961894, 58.340689352), (28.973168979, 56.382218877), (26.469157479, 53.845925587))
            ThreePointArc((26.469157479, 53.845925587), (30, 51.961524227), (33.397360709, 49.845925587))
            ThreePointArc((33.397360709, 49.845925587), (34.34184938, 53.282609803), (34.549038106, 56.840689352))
            Line((34.549038106, 56.840689352), (31.950961894, 58.340689352))
        make_face()
        with BuildLine():
            Line((18.660355239, 63.845838881), (15.76257776, 64.622296016))
            ThreePointArc((15.76257776, 64.622296016), (13.393140136, 61.959849286), (11.630891766, 58.861892229))
            ThreePointArc((11.630891766, 58.861892229), (15.529142706, 57.955549577), (19.358298376, 56.791339868))
            ThreePointArc((19.358298376, 56.791339868), (19.381125049, 60.355373564), (18.660355239, 63.845838881))
        make_face()
    extrude(amount=CIRPATTERN1_DEPTH)

    # Sketch3 → Boss-Extrude3 (add, symmetric)
    with BuildSketch(Plane.XY):
        Circle(SKETCH3_R)
    extrude(amount=BOSS_EXTRUDE3_DEPTH, both=True)

    # Sketch4 → Cut-Extrude1 (cut, through all)
    with BuildSketch(Plane(origin=(0, 0, -20), x_dir=(-1, 0, 0), z_dir=(0, 0, -1))):
        with BuildLine():
            Line((-2.5, 9.682458366), (-2.5, 12))
            Line((-2.5, 12), (2.5, 12))
            Line((2.5, 12), (2.5, 9.682458366))
            ThreePointArc((2.5, 9.682458366), (0, -10), (-2.5, 9.682458366))
        make_face()
    extrude(amount=-CUT_EXTRUDE1_DEPTH, mode=Mode.SUBTRACT)

    # Sketch5 → Cut-Extrude4 (cut)
    with BuildSketch(Plane.XY.offset(CUT_EXTRUDE4_START)):
        Circle(SKETCH5_R)
        Circle(SKETCH5_R_2, mode=Mode.SUBTRACT)
    cut_extrude4 = extrude(amount=CUT_EXTRUDE4_DEPTH, mode=Mode.SUBTRACT)

    # Mirror3: Cut-Extrude4 across plane
    add(cut_extrude4.mirror(Plane.XY), mode=Mode.SUBTRACT)


solid = part.part
